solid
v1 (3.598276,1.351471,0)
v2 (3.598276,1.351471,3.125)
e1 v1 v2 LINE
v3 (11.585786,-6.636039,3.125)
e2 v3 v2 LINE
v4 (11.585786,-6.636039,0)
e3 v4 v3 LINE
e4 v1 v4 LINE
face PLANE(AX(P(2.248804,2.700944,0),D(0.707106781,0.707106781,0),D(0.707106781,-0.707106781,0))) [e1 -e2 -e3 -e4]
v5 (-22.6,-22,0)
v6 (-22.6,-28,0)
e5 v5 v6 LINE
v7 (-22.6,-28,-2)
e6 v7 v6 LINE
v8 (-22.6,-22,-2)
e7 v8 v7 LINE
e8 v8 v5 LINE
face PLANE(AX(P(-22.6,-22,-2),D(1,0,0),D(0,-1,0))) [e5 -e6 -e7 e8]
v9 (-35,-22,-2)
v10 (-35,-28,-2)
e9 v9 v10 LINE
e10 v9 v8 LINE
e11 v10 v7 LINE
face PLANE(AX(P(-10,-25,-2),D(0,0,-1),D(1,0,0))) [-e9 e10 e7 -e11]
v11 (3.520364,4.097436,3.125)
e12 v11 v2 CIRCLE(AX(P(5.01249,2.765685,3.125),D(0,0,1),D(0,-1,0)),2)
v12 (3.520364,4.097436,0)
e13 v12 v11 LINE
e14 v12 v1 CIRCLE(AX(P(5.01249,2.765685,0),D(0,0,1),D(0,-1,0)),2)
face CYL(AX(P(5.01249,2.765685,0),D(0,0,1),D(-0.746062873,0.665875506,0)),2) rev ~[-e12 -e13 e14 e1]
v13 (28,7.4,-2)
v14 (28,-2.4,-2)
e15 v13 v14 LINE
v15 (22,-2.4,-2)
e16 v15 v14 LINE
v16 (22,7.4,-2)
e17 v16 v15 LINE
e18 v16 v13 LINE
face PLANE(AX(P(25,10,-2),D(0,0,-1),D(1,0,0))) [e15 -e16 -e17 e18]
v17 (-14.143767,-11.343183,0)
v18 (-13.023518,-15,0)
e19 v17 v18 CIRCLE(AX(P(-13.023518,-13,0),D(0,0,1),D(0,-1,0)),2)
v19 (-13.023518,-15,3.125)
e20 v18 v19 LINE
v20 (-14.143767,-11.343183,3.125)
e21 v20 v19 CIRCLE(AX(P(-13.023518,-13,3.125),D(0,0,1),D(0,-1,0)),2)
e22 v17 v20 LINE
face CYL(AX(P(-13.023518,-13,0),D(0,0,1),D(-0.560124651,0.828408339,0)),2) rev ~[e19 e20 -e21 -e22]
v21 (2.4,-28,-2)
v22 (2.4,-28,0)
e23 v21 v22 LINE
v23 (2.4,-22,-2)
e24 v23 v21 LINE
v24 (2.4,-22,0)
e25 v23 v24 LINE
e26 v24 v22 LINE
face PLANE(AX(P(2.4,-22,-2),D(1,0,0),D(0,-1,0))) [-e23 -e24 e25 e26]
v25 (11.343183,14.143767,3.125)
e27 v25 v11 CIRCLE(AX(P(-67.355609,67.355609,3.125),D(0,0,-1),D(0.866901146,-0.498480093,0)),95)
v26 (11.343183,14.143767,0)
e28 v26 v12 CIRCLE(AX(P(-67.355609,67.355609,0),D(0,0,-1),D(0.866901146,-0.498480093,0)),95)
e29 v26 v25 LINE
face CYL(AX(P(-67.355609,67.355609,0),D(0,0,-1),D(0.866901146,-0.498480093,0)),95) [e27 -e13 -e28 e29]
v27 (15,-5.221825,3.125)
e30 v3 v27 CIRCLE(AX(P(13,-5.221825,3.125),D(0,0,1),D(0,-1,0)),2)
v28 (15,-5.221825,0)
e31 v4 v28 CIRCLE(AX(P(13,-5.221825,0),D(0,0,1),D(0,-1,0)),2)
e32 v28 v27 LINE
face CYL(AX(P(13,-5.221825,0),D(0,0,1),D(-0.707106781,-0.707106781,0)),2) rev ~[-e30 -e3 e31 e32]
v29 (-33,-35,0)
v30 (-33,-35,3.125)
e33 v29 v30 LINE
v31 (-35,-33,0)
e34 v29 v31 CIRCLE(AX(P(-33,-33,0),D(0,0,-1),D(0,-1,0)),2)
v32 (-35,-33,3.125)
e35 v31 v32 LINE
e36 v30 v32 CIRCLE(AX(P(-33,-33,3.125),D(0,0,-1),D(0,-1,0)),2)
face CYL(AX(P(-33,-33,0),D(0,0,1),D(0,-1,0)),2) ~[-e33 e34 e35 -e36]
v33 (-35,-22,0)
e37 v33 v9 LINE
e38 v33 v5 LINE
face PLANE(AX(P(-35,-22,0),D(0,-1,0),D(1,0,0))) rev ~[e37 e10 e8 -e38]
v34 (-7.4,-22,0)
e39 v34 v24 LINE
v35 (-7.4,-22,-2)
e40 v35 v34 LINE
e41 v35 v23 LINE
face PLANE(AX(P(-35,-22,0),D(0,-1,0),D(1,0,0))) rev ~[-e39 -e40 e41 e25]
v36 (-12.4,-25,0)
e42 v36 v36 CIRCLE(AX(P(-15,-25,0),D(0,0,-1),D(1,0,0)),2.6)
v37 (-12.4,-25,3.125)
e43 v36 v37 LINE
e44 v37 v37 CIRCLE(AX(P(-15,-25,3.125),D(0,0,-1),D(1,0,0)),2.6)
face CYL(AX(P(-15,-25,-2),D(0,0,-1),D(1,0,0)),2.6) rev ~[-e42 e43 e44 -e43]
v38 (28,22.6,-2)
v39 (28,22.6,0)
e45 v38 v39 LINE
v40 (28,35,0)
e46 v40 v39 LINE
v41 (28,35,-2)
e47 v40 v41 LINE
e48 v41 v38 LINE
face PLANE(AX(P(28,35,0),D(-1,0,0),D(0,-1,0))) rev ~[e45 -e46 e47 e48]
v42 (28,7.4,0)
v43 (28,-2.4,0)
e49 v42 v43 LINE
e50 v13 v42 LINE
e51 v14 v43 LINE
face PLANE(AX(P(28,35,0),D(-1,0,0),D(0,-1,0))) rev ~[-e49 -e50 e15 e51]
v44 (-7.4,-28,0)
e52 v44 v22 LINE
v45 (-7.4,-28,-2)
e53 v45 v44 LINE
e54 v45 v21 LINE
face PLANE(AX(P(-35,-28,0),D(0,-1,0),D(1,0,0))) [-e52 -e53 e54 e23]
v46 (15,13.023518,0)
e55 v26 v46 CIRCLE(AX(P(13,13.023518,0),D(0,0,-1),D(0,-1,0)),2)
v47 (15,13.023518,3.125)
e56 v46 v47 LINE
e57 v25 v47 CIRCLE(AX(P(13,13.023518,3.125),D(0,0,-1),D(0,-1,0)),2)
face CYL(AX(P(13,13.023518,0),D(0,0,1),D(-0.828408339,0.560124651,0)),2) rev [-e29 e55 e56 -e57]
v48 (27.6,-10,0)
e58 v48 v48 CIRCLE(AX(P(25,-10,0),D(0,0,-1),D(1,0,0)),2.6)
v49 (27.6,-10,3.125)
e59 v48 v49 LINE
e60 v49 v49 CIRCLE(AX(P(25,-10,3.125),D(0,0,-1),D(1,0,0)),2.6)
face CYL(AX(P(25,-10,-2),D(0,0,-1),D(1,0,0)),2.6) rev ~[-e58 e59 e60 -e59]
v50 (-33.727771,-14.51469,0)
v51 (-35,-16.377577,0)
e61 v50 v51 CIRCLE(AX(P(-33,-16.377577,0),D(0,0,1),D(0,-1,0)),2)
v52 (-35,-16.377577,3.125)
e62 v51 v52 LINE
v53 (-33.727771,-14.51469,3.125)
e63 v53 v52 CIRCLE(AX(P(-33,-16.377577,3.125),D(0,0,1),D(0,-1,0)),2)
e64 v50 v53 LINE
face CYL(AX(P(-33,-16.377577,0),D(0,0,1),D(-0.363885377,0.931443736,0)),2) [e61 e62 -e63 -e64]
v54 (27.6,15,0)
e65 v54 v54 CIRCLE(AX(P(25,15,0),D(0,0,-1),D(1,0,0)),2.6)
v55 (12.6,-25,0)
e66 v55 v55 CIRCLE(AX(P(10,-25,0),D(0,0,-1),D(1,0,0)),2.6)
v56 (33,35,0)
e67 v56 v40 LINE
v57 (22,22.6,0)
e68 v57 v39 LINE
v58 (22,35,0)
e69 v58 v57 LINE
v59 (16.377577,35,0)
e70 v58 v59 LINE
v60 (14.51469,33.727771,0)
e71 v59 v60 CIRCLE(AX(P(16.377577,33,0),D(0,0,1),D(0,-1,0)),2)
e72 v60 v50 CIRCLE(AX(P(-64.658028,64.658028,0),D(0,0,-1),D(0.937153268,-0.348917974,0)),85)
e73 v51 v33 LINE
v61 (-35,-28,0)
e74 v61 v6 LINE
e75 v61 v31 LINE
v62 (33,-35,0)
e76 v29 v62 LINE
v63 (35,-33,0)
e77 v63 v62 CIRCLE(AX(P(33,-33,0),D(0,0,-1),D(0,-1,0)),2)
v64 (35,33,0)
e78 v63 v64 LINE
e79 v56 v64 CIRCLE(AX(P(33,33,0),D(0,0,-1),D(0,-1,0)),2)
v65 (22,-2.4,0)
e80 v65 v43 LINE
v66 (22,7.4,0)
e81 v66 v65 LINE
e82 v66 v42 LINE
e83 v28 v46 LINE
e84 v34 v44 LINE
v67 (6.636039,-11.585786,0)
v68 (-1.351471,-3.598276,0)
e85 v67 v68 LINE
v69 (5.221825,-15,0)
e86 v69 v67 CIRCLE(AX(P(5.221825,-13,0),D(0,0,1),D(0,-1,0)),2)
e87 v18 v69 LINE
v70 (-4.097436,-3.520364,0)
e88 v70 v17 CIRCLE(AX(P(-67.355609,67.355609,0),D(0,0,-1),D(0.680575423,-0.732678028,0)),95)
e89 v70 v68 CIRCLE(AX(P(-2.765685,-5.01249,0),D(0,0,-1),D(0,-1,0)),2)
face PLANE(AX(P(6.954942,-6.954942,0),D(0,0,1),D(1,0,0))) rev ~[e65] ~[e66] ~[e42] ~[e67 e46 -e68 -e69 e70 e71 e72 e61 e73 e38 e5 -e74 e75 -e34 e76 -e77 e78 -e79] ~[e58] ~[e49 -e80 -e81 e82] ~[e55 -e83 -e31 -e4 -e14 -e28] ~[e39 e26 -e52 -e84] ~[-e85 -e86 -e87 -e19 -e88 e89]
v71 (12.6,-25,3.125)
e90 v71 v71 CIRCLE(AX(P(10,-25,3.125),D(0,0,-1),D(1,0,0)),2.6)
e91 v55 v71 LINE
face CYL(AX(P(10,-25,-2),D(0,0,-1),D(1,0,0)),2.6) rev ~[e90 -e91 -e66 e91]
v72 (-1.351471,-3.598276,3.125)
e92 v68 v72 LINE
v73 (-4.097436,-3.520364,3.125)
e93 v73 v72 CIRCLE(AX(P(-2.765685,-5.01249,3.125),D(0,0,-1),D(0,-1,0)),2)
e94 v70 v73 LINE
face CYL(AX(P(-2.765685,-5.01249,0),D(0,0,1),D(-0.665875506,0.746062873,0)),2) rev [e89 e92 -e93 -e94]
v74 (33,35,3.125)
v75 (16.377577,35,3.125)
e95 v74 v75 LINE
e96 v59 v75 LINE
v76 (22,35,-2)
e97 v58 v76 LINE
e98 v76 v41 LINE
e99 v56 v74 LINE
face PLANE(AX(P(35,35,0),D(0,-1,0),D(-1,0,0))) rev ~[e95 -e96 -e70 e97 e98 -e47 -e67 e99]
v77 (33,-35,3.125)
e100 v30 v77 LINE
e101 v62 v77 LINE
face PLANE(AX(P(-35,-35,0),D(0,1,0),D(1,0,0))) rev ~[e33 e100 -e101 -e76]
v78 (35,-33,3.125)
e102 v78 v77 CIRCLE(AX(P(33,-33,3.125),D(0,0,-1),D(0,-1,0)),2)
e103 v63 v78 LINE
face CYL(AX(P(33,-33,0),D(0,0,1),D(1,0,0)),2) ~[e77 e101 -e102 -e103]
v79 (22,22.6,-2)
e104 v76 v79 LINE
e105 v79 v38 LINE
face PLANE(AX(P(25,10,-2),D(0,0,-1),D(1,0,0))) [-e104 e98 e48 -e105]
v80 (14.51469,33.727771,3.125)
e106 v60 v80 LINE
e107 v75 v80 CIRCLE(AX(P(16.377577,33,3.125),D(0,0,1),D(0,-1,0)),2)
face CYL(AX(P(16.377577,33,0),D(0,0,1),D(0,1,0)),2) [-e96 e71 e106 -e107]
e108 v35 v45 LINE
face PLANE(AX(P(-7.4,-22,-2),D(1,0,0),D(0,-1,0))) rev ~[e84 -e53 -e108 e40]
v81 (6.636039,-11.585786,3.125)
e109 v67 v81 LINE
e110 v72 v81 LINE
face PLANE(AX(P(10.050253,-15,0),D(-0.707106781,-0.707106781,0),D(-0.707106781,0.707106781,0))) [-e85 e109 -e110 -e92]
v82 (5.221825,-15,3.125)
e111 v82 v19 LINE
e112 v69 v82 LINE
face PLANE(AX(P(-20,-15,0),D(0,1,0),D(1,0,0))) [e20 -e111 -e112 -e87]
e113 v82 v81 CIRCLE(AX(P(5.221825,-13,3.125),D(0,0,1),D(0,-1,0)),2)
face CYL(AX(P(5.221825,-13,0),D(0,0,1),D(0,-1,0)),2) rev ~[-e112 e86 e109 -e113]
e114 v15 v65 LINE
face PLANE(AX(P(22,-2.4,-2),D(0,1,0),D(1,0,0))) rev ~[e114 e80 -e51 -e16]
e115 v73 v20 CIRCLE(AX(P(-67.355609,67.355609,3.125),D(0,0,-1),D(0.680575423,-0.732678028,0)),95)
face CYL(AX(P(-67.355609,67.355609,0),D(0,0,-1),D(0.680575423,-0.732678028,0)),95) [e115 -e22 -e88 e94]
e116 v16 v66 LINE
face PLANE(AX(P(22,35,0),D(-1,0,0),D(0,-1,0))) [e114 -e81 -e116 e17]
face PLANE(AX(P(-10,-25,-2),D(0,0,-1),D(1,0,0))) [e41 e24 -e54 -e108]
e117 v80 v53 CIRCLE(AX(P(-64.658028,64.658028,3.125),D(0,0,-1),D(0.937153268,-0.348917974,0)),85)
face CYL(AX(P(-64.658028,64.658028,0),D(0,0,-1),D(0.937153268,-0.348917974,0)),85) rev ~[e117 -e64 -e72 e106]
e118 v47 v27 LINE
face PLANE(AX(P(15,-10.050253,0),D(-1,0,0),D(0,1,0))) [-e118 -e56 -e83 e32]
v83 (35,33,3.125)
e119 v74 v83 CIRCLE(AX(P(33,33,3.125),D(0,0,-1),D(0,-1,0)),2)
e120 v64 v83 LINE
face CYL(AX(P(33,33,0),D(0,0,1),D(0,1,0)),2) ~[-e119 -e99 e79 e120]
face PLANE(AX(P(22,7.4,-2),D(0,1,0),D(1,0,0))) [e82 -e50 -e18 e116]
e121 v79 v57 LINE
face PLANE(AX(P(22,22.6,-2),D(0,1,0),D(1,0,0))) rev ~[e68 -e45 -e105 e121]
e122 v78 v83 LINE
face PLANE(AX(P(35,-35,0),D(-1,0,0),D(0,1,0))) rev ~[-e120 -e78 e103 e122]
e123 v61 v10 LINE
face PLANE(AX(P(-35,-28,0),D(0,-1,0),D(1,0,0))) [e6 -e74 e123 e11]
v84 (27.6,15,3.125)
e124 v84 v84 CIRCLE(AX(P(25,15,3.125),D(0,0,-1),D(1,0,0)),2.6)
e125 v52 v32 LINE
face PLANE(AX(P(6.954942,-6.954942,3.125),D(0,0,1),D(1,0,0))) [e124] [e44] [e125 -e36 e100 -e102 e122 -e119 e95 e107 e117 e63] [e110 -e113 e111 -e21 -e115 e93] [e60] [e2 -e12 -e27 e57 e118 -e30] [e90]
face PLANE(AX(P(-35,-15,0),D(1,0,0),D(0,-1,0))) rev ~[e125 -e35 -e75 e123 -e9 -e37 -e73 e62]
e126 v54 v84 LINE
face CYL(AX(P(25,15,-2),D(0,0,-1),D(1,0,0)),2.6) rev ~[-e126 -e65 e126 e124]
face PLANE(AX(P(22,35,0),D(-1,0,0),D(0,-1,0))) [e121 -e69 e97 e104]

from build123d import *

# Parameters (mm, degrees)
F1_DEPTH  = 3.125
F2_W      = 6
F2_H      = 50
F2_W_2    = 50
F2_H_2    = 6
F3_DEPTH  = 2
F4_R      = 2.6
F5_DEPTH  = 25
F6_W      = 6
F6_H      = 12.6
F6_H_2    = 15.2
F7_DEPTH  = 2
F8_W      = 12.6
F8_H      = 6
F8_W_2    = 15.2
F9_DEPTH  = 2
F10_R     = 2
F12_DEPTH = 25
F13_R     = 2


# Not quite as in the source:
# - a feature names something its author has since deleted; it is built from what else it names


with BuildPart() as f1:
    # F0 (on Top) → F1 (new body)
    with BuildSketch(Plane.XY):
        with BuildLine():
            Line((35, 35), (15, 35))
            ThreePointArc((15, 35), (-4.5539513718, 4.5539513718), (-35, -15))
            Line((-35, -15), (-35, -35))
            Line((-35, -35), (35, -35))
            Line((35, -35), (35, 35))
        make_face()
    extrude(amount=F1_DEPTH)

    # F2 (on face) → F3 (join)
    with BuildSketch(Plane(origin=(0, 0, 0), x_dir=(1, 0, 0), z_dir=(0, 0, -1))):
        with Locations((25, -10)):
            Rectangle(F2_W, F2_H)
        with Locations((-10, 25)):
            Rectangle(F2_W_2, F2_H_2)
    extrude(amount=F3_DEPTH)

    # F4 (on face) → F5 (cut)
    with BuildSketch(Plane(origin=(0, 0, -2), x_dir=(1, 0, 0), z_dir=(0, 0, -1))):
        with Locations((25, -15)):
            Circle(F4_R)
        with Locations((25, 10)):
            Circle(F4_R)
        with Locations((10, 25)):
            Circle(F4_R)
        with Locations((-15, 25)):
            Circle(F4_R)
    extrude(amount=-F5_DEPTH, mode=Mode.SUBTRACT)

    # F6 (on face) → F7 (cut)
    with BuildSketch(Plane(origin=(0, 0, -2), x_dir=(1, 0, 0), z_dir=(0, 0, -1))):
        with Locations((25, 8.7)):
            Rectangle(F6_W, F6_H)
        with Locations((25, -15)):
            Rectangle(F6_W, F6_H_2)
    extrude(amount=-F7_DEPTH, mode=Mode.SUBTRACT)

    # F8 (on face) → F9 (cut)
    with BuildSketch(Plane(origin=(0, 0, -2), x_dir=(1, 0, 0), z_dir=(0, 0, -1))):
        with Locations((8.7, 25)):
            Rectangle(F8_W, F8_H)
        with Locations((-15, 25)):
            Rectangle(F8_W_2, F8_H)
    extrude(amount=-F9_DEPTH, mode=Mode.SUBTRACT)

    # F10
    f10_edges = [f1.edges().sort_by_distance(p)[0] for p in [
        (35, 35, 1.5625),
        (15, 35, 1.5625),
        (-35, -15, 1.5625),
        (-35, -35, 1.5625),
        (35, -35, 1.5625),
    ]]
    fillet(f10_edges, radius=F10_R)

    # F11 (on Top) → F12 (cut)
    with BuildSketch(Plane.XY):
        with BuildLine():
            Line((15, -10.0502525317), (15, 20))
            ThreePointArc((15, 20), (9.1151461726, 10.9887424757), (2.2488038315, 2.7009436368))
            Line((2.2488038315, 2.7009436368), (15, -10.0502525317))
        make_face()
        with BuildLine():
            ThreePointArc((-2.7009436368, -2.2488038315), (-10.9887424757, -9.1151461726), (-20, -15))
            Line((-20, -15), (10.0502525317, -15))
            Line((10.0502525317, -15), (-2.7009436368, -2.2488038315))
        make_face()
    extrude(amount=F12_DEPTH, mode=Mode.SUBTRACT)

    # F13
    f13_edges = [f1.edges().sort_by_distance(p)[0] for p in [
        (15, 20, 1.5625),
        (-20, -15, 1.5625),
        (2.248804, 2.700944, 1.5625),
        (-2.700944, -2.248804, 1.5625),
        (10.050253, -15, 1.5625),
        (15, -10.050253, 1.5625),
    ]]
    fillet(f13_edges, radius=F13_R)


solid = f1.part
